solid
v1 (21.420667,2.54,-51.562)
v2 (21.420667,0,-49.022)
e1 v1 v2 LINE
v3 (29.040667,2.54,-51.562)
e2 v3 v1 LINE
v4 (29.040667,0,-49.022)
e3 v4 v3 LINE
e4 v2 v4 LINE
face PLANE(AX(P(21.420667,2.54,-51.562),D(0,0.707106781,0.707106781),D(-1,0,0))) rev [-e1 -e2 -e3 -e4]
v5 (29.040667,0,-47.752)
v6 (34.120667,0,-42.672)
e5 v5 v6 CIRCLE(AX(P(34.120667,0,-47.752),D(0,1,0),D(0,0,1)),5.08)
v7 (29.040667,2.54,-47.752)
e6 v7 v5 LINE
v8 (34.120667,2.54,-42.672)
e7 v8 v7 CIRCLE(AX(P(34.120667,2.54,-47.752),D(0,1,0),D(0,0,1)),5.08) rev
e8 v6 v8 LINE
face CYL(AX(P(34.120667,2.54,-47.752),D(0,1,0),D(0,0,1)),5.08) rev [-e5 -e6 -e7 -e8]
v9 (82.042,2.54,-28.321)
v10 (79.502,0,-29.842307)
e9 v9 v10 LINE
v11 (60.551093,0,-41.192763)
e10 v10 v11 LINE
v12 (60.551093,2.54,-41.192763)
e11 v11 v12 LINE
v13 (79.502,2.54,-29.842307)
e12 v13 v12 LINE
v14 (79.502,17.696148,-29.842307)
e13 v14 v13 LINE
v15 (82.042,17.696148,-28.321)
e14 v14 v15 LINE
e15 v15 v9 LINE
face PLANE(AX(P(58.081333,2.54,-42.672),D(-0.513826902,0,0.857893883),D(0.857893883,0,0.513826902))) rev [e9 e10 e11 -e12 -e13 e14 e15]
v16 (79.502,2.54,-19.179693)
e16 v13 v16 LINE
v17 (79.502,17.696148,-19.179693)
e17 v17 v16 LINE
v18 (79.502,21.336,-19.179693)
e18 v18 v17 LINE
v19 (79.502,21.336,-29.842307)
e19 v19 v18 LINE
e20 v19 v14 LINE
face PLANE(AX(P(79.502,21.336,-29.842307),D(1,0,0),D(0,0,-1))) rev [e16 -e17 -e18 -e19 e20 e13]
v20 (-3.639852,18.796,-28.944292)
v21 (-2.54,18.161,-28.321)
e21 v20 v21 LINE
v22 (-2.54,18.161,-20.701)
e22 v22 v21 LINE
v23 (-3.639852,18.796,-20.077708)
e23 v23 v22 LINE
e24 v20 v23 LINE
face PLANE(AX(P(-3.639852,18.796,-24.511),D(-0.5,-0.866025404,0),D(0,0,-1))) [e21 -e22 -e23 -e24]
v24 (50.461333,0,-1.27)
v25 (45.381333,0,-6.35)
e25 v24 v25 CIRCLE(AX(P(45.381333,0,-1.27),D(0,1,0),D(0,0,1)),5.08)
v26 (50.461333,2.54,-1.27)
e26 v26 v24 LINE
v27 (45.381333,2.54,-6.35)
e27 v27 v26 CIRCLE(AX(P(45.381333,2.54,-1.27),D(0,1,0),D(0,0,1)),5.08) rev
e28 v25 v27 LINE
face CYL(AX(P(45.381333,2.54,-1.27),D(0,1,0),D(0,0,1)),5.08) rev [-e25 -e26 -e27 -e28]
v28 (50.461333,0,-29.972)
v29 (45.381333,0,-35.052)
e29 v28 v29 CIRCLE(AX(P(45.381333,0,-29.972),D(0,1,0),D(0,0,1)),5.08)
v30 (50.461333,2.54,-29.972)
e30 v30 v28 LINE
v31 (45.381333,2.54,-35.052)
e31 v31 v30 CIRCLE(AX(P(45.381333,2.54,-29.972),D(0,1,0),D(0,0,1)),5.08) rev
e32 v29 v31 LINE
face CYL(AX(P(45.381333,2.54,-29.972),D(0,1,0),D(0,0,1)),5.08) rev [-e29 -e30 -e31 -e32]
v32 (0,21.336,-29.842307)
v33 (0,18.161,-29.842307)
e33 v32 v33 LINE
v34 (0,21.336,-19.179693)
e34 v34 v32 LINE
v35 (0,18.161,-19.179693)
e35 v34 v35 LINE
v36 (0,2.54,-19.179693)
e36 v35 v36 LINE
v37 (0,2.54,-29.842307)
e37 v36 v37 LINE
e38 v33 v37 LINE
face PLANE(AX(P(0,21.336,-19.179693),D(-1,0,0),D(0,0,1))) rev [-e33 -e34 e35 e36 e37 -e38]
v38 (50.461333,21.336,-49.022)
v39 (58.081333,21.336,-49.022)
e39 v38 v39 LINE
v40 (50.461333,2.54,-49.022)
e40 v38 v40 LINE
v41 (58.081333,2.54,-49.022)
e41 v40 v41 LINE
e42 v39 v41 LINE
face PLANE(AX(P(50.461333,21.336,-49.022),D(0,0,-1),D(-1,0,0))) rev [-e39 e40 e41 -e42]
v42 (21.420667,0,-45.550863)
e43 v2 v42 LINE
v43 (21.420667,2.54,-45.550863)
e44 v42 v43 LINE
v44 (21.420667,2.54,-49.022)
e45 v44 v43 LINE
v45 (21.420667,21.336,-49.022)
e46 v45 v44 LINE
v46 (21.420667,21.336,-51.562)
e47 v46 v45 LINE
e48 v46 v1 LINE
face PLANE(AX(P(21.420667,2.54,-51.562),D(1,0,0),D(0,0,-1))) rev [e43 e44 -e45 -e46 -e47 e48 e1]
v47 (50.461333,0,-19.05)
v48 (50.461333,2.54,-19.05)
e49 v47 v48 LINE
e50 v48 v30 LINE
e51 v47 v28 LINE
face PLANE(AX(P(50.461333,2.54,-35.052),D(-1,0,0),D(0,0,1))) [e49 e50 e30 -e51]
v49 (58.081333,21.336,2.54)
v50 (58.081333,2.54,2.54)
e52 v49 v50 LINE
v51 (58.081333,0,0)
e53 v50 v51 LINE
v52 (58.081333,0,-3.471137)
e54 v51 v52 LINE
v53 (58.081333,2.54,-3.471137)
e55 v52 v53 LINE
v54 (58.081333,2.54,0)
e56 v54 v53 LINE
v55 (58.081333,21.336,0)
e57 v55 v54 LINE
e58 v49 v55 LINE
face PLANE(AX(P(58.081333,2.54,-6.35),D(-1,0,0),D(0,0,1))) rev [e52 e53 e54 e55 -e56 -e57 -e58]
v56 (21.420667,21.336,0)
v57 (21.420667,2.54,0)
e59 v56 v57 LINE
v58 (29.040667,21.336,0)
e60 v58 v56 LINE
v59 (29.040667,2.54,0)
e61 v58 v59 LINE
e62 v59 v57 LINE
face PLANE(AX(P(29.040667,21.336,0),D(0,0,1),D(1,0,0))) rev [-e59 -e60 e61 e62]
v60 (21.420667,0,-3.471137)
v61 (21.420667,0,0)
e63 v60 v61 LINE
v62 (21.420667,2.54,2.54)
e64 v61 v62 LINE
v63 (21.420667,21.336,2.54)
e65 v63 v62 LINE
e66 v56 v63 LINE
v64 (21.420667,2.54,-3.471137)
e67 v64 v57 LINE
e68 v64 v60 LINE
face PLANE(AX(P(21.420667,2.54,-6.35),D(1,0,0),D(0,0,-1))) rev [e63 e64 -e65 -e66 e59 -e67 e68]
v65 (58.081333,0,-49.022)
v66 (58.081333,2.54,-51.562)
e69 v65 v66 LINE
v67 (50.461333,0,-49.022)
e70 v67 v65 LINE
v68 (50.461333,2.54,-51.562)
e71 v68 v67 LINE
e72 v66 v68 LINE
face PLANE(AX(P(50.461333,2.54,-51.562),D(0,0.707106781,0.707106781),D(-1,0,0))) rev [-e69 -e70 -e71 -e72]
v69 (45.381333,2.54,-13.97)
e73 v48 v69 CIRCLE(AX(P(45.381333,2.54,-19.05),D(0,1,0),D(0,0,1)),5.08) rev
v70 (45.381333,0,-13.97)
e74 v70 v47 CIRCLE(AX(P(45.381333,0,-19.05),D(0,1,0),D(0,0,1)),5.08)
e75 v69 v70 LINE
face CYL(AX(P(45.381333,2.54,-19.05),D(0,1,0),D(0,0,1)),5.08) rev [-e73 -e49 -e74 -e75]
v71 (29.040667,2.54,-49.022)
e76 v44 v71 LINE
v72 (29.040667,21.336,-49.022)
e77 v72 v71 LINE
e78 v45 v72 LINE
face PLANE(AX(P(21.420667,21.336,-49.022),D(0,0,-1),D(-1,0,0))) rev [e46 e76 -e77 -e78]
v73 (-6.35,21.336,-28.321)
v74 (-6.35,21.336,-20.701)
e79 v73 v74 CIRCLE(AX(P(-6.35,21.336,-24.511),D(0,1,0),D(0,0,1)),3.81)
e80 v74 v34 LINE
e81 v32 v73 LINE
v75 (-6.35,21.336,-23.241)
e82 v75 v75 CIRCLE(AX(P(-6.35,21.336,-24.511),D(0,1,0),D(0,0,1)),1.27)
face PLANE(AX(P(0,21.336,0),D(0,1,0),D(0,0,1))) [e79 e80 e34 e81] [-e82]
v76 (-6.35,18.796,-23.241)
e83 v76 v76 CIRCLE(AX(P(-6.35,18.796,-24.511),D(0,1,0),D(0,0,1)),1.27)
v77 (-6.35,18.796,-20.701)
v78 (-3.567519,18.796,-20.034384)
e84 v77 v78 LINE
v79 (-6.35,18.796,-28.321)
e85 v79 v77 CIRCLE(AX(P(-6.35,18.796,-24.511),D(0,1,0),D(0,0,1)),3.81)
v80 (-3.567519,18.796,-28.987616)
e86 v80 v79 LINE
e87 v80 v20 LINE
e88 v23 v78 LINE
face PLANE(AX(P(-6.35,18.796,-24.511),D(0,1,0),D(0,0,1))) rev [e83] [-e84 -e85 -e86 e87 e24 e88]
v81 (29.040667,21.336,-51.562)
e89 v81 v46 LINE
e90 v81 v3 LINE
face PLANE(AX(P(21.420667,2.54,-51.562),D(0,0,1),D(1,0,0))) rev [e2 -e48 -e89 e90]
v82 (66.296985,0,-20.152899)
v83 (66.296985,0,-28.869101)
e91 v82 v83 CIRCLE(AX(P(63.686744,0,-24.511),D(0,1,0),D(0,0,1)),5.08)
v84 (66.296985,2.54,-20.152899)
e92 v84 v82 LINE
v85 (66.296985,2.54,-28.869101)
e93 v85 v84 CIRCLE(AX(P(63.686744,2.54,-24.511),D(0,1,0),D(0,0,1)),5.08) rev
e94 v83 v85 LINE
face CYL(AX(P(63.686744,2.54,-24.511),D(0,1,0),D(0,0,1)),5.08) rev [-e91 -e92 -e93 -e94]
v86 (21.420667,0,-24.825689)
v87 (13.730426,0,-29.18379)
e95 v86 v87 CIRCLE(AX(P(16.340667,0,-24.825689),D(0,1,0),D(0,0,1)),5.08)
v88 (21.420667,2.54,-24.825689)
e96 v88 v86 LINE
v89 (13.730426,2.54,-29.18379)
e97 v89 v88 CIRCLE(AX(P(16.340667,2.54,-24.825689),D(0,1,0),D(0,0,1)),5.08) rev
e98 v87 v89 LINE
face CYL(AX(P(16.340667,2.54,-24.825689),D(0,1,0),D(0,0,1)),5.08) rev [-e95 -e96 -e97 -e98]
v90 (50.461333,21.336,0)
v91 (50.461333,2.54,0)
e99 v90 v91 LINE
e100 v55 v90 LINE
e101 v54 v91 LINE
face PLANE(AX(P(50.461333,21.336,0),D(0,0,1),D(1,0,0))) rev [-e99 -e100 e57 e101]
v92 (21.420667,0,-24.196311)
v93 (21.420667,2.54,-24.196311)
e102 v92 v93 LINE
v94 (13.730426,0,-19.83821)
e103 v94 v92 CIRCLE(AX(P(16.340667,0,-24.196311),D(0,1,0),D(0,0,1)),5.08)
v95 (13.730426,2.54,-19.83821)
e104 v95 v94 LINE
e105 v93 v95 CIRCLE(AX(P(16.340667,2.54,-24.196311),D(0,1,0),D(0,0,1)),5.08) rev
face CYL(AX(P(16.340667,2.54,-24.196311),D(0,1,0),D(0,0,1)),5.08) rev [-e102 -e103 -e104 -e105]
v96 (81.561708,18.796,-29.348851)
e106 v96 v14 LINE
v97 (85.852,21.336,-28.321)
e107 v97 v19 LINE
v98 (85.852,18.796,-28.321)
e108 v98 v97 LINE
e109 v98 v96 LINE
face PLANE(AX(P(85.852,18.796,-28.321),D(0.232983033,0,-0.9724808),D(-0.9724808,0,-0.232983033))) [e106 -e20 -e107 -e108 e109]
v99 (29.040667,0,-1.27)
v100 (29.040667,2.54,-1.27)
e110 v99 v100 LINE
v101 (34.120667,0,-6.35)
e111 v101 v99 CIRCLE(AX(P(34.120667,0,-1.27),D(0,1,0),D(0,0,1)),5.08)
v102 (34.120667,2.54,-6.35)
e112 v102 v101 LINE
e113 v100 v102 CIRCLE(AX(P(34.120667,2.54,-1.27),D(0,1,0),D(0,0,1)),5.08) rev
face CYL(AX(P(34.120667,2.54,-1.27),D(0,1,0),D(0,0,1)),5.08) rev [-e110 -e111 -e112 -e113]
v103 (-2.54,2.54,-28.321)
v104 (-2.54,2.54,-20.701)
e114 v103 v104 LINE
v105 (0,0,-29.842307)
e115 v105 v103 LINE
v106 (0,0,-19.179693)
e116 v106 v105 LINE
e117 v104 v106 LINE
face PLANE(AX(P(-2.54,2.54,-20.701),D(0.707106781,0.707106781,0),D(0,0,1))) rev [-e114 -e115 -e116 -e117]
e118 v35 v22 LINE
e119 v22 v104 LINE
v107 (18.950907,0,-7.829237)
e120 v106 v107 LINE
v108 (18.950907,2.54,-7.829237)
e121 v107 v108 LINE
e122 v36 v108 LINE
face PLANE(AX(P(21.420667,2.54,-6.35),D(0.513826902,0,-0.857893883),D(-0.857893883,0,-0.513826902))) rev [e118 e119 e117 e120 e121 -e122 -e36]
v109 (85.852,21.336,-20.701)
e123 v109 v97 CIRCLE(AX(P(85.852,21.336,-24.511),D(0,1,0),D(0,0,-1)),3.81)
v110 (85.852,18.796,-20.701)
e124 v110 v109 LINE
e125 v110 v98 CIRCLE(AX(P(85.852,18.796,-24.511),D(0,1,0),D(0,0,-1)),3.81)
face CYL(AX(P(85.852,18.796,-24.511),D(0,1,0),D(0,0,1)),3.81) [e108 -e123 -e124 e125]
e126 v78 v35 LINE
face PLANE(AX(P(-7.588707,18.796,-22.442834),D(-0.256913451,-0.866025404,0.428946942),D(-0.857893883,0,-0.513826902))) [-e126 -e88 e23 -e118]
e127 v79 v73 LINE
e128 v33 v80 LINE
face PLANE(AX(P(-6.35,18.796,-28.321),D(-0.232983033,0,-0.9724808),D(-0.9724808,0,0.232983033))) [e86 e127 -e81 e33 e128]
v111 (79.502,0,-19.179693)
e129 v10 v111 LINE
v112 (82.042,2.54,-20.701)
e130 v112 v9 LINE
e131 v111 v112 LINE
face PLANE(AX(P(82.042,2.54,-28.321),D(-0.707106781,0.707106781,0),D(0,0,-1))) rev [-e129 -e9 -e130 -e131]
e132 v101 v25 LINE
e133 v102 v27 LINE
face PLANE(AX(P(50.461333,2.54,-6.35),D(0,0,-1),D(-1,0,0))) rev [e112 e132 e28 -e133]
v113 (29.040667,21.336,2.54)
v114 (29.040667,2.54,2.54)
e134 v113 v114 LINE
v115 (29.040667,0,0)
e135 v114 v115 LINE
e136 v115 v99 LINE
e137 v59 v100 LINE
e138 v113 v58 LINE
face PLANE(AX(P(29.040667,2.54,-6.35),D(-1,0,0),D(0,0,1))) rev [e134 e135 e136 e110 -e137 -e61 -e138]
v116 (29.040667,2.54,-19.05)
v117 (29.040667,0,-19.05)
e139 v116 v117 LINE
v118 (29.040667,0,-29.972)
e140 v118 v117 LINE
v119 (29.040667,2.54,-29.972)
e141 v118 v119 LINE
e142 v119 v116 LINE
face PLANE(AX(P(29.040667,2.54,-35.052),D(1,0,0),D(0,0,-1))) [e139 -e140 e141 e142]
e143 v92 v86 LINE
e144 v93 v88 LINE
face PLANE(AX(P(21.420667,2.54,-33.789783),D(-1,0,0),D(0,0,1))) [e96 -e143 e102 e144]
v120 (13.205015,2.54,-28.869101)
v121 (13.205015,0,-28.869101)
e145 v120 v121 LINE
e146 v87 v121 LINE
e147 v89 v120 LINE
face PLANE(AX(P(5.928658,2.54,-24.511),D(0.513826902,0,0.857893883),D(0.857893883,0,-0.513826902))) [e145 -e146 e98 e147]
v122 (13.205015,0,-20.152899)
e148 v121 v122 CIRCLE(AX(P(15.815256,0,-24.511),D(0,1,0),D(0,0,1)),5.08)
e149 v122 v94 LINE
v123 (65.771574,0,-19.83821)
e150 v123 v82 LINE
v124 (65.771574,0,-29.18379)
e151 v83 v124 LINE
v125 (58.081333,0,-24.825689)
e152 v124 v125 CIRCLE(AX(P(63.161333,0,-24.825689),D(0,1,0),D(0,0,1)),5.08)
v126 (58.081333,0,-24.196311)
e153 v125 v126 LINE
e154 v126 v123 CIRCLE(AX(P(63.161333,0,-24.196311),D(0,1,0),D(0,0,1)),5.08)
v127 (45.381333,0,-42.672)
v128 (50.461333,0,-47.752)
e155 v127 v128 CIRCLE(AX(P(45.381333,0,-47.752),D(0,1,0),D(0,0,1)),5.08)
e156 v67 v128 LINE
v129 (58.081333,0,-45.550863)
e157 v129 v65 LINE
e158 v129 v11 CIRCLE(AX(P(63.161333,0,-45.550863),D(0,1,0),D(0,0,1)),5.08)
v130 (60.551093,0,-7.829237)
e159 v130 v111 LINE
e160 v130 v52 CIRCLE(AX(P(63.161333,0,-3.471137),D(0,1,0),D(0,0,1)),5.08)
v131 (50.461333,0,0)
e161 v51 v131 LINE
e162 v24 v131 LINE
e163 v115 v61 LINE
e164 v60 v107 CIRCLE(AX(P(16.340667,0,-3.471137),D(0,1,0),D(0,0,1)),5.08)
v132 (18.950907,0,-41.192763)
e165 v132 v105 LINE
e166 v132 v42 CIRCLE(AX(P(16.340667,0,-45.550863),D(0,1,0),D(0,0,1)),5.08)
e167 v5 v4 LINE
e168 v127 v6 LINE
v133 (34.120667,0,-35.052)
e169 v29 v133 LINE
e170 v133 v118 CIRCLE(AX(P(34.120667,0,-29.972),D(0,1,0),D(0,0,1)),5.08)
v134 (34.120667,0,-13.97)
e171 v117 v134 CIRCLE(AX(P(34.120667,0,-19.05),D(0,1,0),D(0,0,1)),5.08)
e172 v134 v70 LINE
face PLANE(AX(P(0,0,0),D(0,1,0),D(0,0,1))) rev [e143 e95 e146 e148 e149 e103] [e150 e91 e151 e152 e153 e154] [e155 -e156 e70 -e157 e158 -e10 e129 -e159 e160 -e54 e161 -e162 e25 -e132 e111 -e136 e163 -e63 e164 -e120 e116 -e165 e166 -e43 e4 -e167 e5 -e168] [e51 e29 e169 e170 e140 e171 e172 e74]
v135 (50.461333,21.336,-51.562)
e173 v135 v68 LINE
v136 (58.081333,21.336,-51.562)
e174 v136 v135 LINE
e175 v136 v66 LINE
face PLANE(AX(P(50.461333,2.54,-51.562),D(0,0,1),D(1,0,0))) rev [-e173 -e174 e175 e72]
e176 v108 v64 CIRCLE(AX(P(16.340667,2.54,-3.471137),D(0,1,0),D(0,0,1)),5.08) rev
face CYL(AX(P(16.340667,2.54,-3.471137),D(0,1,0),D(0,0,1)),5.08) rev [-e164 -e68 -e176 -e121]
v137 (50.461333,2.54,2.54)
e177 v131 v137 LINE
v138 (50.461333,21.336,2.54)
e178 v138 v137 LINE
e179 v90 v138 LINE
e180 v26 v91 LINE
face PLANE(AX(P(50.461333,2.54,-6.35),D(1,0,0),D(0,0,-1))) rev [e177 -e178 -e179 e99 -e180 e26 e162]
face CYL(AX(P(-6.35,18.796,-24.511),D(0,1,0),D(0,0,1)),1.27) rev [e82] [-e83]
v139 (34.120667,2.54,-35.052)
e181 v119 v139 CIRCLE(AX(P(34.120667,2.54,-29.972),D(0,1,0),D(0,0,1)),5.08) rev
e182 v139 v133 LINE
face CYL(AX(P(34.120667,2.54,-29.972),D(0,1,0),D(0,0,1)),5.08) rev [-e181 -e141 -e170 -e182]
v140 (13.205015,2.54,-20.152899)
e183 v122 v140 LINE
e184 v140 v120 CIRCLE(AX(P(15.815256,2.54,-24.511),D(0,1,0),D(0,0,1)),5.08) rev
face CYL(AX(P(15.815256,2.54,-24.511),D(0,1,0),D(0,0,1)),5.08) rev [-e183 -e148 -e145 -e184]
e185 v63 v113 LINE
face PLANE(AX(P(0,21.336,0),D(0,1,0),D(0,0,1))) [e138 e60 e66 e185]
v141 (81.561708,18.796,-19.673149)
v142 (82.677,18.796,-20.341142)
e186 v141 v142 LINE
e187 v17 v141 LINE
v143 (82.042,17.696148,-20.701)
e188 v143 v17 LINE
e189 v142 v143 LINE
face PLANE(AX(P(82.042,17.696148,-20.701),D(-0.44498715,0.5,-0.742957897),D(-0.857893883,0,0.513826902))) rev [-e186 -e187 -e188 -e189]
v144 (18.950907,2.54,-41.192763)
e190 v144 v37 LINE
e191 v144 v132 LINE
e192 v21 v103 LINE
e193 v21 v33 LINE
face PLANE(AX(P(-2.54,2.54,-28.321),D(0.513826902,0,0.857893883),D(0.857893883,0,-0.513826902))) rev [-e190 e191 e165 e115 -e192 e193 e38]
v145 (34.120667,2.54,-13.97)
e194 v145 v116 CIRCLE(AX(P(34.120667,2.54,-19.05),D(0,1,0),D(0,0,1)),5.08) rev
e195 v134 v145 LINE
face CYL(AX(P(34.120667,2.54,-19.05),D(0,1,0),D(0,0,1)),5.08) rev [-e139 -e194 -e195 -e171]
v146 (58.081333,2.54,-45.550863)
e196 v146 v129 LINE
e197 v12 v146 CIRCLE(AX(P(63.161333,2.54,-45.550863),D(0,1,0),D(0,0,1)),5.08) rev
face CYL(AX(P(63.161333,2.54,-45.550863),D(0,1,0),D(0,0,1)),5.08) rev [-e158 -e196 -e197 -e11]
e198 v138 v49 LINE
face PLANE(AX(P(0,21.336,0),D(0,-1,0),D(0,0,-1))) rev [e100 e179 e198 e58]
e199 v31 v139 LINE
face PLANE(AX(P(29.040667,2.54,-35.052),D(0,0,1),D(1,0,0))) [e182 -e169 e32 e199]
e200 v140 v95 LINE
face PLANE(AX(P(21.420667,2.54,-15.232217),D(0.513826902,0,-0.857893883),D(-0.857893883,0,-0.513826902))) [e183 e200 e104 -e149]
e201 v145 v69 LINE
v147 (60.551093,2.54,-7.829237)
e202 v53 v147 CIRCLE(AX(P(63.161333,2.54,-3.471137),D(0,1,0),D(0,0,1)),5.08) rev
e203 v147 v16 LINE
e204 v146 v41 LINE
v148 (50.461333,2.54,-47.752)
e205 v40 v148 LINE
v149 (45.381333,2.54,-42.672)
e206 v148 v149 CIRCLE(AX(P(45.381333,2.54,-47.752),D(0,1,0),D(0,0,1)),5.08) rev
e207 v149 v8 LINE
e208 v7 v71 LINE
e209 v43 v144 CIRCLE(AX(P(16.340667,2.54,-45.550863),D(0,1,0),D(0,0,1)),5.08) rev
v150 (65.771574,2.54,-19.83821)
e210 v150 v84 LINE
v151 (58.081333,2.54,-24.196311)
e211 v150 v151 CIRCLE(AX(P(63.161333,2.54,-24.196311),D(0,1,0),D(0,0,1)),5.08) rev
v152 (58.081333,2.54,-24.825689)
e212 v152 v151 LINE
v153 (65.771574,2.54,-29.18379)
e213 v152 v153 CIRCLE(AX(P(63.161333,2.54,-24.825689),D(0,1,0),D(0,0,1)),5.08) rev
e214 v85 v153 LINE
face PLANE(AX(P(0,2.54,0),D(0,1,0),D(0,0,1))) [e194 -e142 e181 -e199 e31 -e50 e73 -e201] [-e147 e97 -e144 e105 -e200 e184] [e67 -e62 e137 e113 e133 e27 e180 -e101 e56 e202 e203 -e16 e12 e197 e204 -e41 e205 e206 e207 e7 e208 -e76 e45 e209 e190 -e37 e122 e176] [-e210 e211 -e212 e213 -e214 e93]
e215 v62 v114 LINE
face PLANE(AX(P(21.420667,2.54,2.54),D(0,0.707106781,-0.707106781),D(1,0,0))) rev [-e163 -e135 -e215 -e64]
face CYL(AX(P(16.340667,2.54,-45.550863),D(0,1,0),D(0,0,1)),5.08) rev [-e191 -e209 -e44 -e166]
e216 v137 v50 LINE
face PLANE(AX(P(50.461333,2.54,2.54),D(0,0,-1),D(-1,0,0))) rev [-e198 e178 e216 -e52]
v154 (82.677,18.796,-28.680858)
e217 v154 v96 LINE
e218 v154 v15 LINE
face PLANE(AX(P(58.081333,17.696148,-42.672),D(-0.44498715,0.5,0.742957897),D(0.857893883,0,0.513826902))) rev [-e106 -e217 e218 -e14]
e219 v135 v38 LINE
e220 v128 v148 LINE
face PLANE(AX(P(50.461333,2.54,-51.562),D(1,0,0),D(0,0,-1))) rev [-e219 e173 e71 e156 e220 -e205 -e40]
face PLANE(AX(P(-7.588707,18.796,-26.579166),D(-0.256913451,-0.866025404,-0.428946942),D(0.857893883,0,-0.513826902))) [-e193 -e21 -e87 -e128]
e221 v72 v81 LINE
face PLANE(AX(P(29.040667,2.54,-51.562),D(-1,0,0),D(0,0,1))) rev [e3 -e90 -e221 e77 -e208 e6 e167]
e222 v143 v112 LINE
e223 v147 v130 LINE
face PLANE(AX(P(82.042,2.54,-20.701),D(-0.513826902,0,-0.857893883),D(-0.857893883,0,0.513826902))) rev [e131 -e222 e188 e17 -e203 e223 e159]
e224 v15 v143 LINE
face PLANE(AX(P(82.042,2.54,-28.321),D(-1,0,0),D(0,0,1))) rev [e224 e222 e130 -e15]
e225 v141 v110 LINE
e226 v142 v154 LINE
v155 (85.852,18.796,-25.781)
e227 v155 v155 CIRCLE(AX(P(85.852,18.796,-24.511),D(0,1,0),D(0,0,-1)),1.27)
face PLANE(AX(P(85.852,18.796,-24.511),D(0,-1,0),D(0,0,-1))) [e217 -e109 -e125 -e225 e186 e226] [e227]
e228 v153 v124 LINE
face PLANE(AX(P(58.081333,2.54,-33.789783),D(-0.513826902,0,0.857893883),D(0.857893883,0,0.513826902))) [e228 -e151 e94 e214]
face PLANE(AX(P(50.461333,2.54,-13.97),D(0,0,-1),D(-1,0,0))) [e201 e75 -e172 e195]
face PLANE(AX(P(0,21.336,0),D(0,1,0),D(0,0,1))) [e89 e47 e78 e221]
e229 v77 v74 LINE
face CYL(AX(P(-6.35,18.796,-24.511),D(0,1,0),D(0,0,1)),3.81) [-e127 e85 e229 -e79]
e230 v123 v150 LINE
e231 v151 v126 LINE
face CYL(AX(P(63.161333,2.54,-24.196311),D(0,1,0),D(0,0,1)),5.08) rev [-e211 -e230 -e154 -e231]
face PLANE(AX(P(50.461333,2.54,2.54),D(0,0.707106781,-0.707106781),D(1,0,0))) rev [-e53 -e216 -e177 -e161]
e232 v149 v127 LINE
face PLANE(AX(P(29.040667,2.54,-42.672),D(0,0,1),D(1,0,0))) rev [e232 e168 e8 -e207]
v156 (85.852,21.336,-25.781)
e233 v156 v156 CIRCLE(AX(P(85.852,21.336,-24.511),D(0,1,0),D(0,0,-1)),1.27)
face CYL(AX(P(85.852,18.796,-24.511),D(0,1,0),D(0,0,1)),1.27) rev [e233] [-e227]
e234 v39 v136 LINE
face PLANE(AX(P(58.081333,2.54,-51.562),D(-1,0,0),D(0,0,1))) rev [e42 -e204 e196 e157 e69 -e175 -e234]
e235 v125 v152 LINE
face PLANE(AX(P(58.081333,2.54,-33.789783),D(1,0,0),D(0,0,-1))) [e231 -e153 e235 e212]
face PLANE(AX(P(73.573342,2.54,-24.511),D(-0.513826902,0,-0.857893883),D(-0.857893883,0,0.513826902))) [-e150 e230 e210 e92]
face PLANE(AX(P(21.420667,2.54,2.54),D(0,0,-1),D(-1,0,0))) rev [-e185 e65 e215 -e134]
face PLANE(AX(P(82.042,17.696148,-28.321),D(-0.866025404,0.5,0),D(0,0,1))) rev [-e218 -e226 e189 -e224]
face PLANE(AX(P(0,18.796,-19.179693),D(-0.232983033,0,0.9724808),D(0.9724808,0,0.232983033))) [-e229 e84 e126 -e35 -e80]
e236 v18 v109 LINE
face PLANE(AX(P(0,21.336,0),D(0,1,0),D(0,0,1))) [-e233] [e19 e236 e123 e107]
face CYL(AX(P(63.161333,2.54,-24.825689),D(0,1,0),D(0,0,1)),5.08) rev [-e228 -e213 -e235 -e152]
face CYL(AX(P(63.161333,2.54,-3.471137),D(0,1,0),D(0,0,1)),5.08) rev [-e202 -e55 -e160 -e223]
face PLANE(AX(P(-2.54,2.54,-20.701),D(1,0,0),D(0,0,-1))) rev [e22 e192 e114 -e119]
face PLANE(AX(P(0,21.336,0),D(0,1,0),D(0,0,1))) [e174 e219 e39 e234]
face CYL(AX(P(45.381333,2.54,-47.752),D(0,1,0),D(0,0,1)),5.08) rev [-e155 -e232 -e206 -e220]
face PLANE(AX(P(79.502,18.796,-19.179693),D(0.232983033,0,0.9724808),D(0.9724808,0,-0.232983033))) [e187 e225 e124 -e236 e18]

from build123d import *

# Parameters (mm, degrees)
SKETCH1_W           = 21.420666666
SKETCH1_H           = 21.082
BOSS_EXTRUDE1_DEPTH = 2.54
SKETCH2_W           = 7.62
SKETCH2_H           = 2.54
BOSS_EXTRUDE2_DEPTH = 18.796
FILLET1_R           = 5.08
CHAMFER1_SIZE       = 2.54
SKETCH3_R           = 1.27
BOSS_EXTRUDE3_DEPTH = 2.54
CHAMFER2_SIZE       = 0.635
CHAMFER2_SIZE_2     = 1.099852263


with BuildPart() as part:
    # Sketch1 → Boss-Extrude1 (new body)
    with BuildSketch(Plane(origin=(0, 0, 0), x_dir=(1, 0, 0), z_dir=(0, 1, 0))):
        Polygon((-2.54, 28.321), (21.420666667, 42.672), (21.420666667, 51.562), (29.040666667, 51.562), (29.040666667, 42.672), (50.461333333, 42.672), (50.461333333, 51.562), (58.081333333, 51.562), (58.081333333, 42.672), (82.042, 28.321), (82.042, 20.701), (58.081333333, 6.35), (58.081333333, -2.54), (50.461333333, -2.54), (50.461333333, 6.35), (29.040666667, 6.35), (29.040666667, -2.54), (21.420666667, -2.54), (21.420666667, 6.35), (-2.54, 20.701), align=None)
        Polygon((5.928658004, 24.511), (21.420666667, 33.789782574), (21.420666667, 15.232217426), align=None, mode=Mode.SUBTRACT)
        with Locations((39.751, 24.511)):
            Rectangle(SKETCH1_W, SKETCH1_H, mode=Mode.SUBTRACT)
        Polygon((58.081333333, 33.789782574), (73.573341996, 24.511), (58.081333333, 15.232217426), align=None, mode=Mode.SUBTRACT)
    extrude(amount=BOSS_EXTRUDE1_DEPTH)

    # Sketch2 → Boss-Extrude2 (add)
    with BuildSketch(Plane(origin=(0, 2.54, 0), x_dir=(1, 0, 0), z_dir=(0, 1, 0))):
        with Locations((25.230666667, 50.292)):
            Rectangle(SKETCH2_W, SKETCH2_H)
        with Locations((54.271333333, 50.292)):
            Rectangle(SKETCH2_W, SKETCH2_H)
        with Locations((25.230666667, -1.27)):
            Rectangle(SKETCH2_W, SKETCH2_H)
        with Locations((54.271333333, -1.27)):
            Rectangle(SKETCH2_W, SKETCH2_H)
        Polygon((-2.54, 20.701), (0, 19.17969258), (0, 29.84230742), (-2.54, 28.321), align=None)
        Polygon((82.042, 28.321), (79.502, 29.84230742), (79.502, 19.17969258), (82.042, 20.701), align=None)
    extrude(amount=BOSS_EXTRUDE2_DEPTH)

    # Fillet1
    fillet1_edges = [part.edges().sort_by_distance(p)[0] for p in [
        (29.040666667, 1.27, -42.672),
        (50.461333333, 1.27, -42.672),
        (58.081333333, 1.27, -42.672),
        (58.081333333, 1.27, -6.35),
        (50.461333333, 1.27, -6.35),
        (29.040666667, 1.27, -6.35),
        (21.420666667, 1.27, -6.35),
        (21.420666667, 1.27, -42.672),
        (5.928658004, 1.27, -24.511),
        (21.420666667, 1.27, -15.232217426),
        (21.420666667, 1.27, -33.789782574),
        (58.081333333, 1.27, -15.232217426),
        (73.573341996, 1.27, -24.511),
        (58.081333333, 1.27, -33.789782574),
        (29.040666667, 1.27, -35.052),
        (29.040666667, 1.27, -13.97),
        (50.461333333, 1.27, -13.97),
        (50.461333333, 1.27, -35.052),
    ]]
    fillet(fillet1_edges, radius=FILLET1_R)

    # Chamfer1
    chamfer1_edges = [part.edges().sort_by_distance(p)[0] for p in [
        (25.230666667, 0, -51.562),
        (54.271333333, 0, -51.562),
        (82.042, 0, -24.511),
        (54.271333333, 0, 2.54),
        (25.230666667, 0, 2.54),
        (-2.54, 0, -24.511),
    ]]
    chamfer(chamfer1_edges, length=CHAMFER1_SIZE)

    # Sketch3 → Boss-Extrude3 (add)
    # profile 1 of 2: a face of its own
    with BuildSketch(Plane(origin=(0, 21.336, 0), x_dir=(1, 0, 0), z_dir=(0, 1, 0))):
        with BuildLine():
            Line((-6.35, 28.321), (0, 29.84230742))
            Line((0, 29.84230742), (0, 19.17969258))
            Line((0, 19.17969258), (-6.35, 20.701))
            ThreePointArc((-6.35, 20.701), (-10.16, 24.511), (-6.35, 28.321))
        make_face()
        with Locations(Location((-6.35, 24.511, 0), (0, 0, 270))):
            Circle(SKETCH3_R, mode=Mode.SUBTRACT)
    # profile 2 of 2: a face of its own
    with BuildSketch(Plane(origin=(0, 21.336, 0), x_dir=(1, 0, 0), z_dir=(0, 1, 0))):
        with BuildLine():
            Line((79.502, 19.17969258), (85.852, 20.701))
            ThreePointArc((85.852, 20.701), (89.662, 24.511), (85.852, 28.321))
            Line((85.852, 28.321), (79.502, 29.84230742))
            Line((79.502, 29.84230742), (79.502, 19.17969258))
        make_face()
        with Locations(Location((85.852, 24.511, 0), (0, 0, 90))):
            Circle(SKETCH3_R, mode=Mode.SUBTRACT)
    extrude(amount=-BOSS_EXTRUDE3_DEPTH)

    # Chamfer2
    # the kernel refuses this chamfer: 1.099852263, 0.635 mm, written as the material it adds along each edge
    with BuildSketch(Plane(origin=(2.441061654, 18.796, -31.304356715), x_dir=(0, -1, 0), z_dir=(-0.8578938832772348, 0, 0.5138269018215241))) as chamfer2_piece_1_section:
        Polygon((CHAMFER2_SIZE, 0), (0, -CHAMFER2_SIZE_2), (0, 0), align=None)
    chamfer2_piece_1 = extrude(amount=8.651563385, mode=Mode.PRIVATE)
    chamfer2_piece_1 = split(chamfer2_piece_1, bisect_by=Plane(origin=(-2.54, 18.796, -31.304356715), z_dir=(1, 0, 0)), keep=Keep.TOP, mode=Mode.PRIVATE)
    chamfer2_piece_1 = split(chamfer2_piece_1, bisect_by=Plane(origin=(2.639816898, 18.796, -30.474744119), z_dir=(0.2329830326651444, 0, 0.9724808000624754)), keep=Keep.TOP, mode=Mode.PRIVATE)
    add(chamfer2_piece_1)
    with BuildSketch(Plane(origin=(-2.54, 18.796, -31.166412121), x_dir=(-1, 0, 0), z_dir=(0, 0, 1))) as chamfer2_piece_2_section:
        Polygon((CHAMFER2_SIZE_2, 0), (0, CHAMFER2_SIZE), (0, 0), align=None)
    chamfer2_piece_2 = extrude(amount=13.310824243, mode=Mode.PRIVATE)
    chamfer2_piece_2 = split(chamfer2_piece_2, bisect_by=Plane(origin=(-1.285716853, 18.796, -29.072240259), z_dir=(0.5138269018215241, 0, 0.8578938832772348)), keep=Keep.TOP, mode=Mode.PRIVATE)
    chamfer2_piece_2 = split(chamfer2_piece_2, bisect_by=Plane(origin=(-7.153247393, 18.796, -23.464058067), z_dir=(0.5138269018215242, 0, -0.8578938832772348)), keep=Keep.TOP, mode=Mode.PRIVATE)
    add(chamfer2_piece_2)
    with BuildSketch(Plane(origin=(-4.981061654, 18.796, -22.163049295), x_dir=(-0.5138269018215241, -3.2301735414316882e-15, 0.8578938832772347), z_dir=(0.8578938832772348, 0, 0.5138269018215242))) as chamfer2_piece_3_section:
        Polygon((CHAMFER2_SIZE_2, 0), (0, CHAMFER2_SIZE), (0, 0), align=None)
    chamfer2_piece_3 = extrude(amount=8.651563385, mode=Mode.PRIVATE)
    chamfer2_piece_3 = split(chamfer2_piece_3, bisect_by=Plane(origin=(-2.54, 18.796, -22.163049295), z_dir=(1, 0, 0)), keep=Keep.TOP, mode=Mode.PRIVATE)
    chamfer2_piece_3 = split(chamfer2_piece_3, bisect_by=Plane(origin=(-5.386627864, 18.796, -20.470199184), z_dir=(0.2329830326651444, 0, -0.9724808000624754)), keep=Keep.TOP, mode=Mode.PRIVATE)
    add(chamfer2_piece_3)
    with BuildSketch(Plane(origin=(82.042, 18.796, -31.166412121), x_dir=(0, -1, 0), z_dir=(0, 0, 1))) as chamfer2_piece_4_section:
        Polygon((CHAMFER2_SIZE_2, 0), (0, CHAMFER2_SIZE), (0, 0), align=None)
    chamfer2_piece_4 = extrude(amount=13.310824243, mode=Mode.PRIVATE)
    chamfer2_piece_4 = split(chamfer2_piece_4, bisect_by=Plane(origin=(80.787716853, 18.796, -29.072240259), z_dir=(-0.5138269018215241, 0, 0.8578938832772348)), keep=Keep.TOP, mode=Mode.PRIVATE)
    chamfer2_piece_4 = split(chamfer2_piece_4, bisect_by=Plane(origin=(86.655247393, 18.796, -23.464058067), z_dir=(-0.5138269018215241, 0, -0.8578938832772349)), keep=Keep.TOP, mode=Mode.PRIVATE)
    add(chamfer2_piece_4)
    with BuildSketch(Plane(origin=(84.483061654, 18.796, -22.163049295), x_dir=(0, -1, 0), z_dir=(-0.8578938832772349, 0, 0.5138269018215241))) as chamfer2_piece_5_section:
        Polygon((CHAMFER2_SIZE_2, 0), (0, CHAMFER2_SIZE), (0, 0), align=None)
    chamfer2_piece_5 = extrude(amount=8.651563385, mode=Mode.PRIVATE)
    chamfer2_piece_5 = split(chamfer2_piece_5, bisect_by=Plane(origin=(82.042, 18.796, -22.163049295), z_dir=(-1, 0, 0)), keep=Keep.TOP, mode=Mode.PRIVATE)
    chamfer2_piece_5 = split(chamfer2_piece_5, bisect_by=Plane(origin=(84.888627864, 18.796, -20.470199184), z_dir=(-0.23298303266514464, 0, -0.9724808000624754)), keep=Keep.TOP, mode=Mode.PRIVATE)
    add(chamfer2_piece_5)
    with BuildSketch(Plane(origin=(77.060938346, 18.796, -31.304356715), x_dir=(0, -1, 0), z_dir=(0.8578938832772348, 0, 0.5138269018215241))) as chamfer2_piece_6_section:
        Polygon((CHAMFER2_SIZE_2, 0), (0, CHAMFER2_SIZE), (0, 0), align=None)
    chamfer2_piece_6 = extrude(amount=8.651563385, mode=Mode.PRIVATE)
    chamfer2_piece_6 = split(chamfer2_piece_6, bisect_by=Plane(origin=(82.042, 18.796, -31.304356715), z_dir=(-1, 0, 0)), keep=Keep.TOP, mode=Mode.PRIVATE)
    chamfer2_piece_6 = split(chamfer2_piece_6, bisect_by=Plane(origin=(76.862183102, 18.796, -30.474744119), z_dir=(-0.23298303266514414, 0, 0.9724808000624755)), keep=Keep.TOP, mode=Mode.PRIVATE)
    add(chamfer2_piece_6)
    with BuildSketch(Plane(origin=(2.441061654, 18.796, -31.304356715), x_dir=(0, -1, 0), z_dir=(-0.8578938832772348, 0, 0.5138269018215241))) as chamfer2_piece_7a_section:
        Polygon((CHAMFER2_SIZE, 0), (0, -CHAMFER2_SIZE_2), (0, 0), align=None)
    chamfer2_piece_7a = extrude(amount=8.651563385, mode=Mode.PRIVATE)
    chamfer2_piece_7a = split(chamfer2_piece_7a, bisect_by=Plane(origin=(-2.54, 18.796, -31.304356715), z_dir=(-1, 0, 0)), keep=Keep.TOP, mode=Mode.PRIVATE)
    chamfer2_piece_7a = split(chamfer2_piece_7a, bisect_by=Plane(origin=(2.639816898, 18.796, -30.474744119), z_dir=(0.2329830326651444, 0, 0.9724808000624754)), keep=Keep.TOP, mode=Mode.PRIVATE)
    with BuildSketch(Plane(origin=(-2.54, 18.796, -31.166412121), x_dir=(-1, 0, 0), z_dir=(0, 0, 1))) as chamfer2_piece_7b_section:
        Polygon((CHAMFER2_SIZE_2, 0), (0, CHAMFER2_SIZE), (0, 0), align=None)
    chamfer2_piece_7b = extrude(amount=13.310824243, mode=Mode.PRIVATE)
    chamfer2_piece_7b = split(chamfer2_piece_7b, bisect_by=Plane(origin=(-1.285716853, 18.796, -29.072240259), z_dir=(-0.5138269018215241, 0, -0.8578938832772348)), keep=Keep.TOP, mode=Mode.PRIVATE)
    chamfer2_piece_7b = split(chamfer2_piece_7b, bisect_by=Plane(origin=(-2.1021216, 18.796, -29.338689596), z_dir=(0.2329830326651444, 0, 0.9724808000624754)), keep=Keep.TOP, mode=Mode.PRIVATE)
    chamfer2_piece_7 = chamfer2_piece_7a & chamfer2_piece_7b
    add(chamfer2_piece_7)
    with BuildSketch(Plane(origin=(-4.981061654, 18.796, -22.163049295), x_dir=(-0.5138269018215241, -3.2301735414316882e-15, 0.8578938832772347), z_dir=(0.8578938832772348, 0, 0.5138269018215242))) as chamfer2_piece_8a_section:
        Polygon((CHAMFER2_SIZE_2, 0), (0, CHAMFER2_SIZE), (0, 0), align=None)
    chamfer2_piece_8a = extrude(amount=8.651563385, mode=Mode.PRIVATE)
    chamfer2_piece_8a = split(chamfer2_piece_8a, bisect_by=Plane(origin=(-2.54, 18.796, -22.163049295), z_dir=(-1, 0, 0)), keep=Keep.TOP, mode=Mode.PRIVATE)
    chamfer2_piece_8a = split(chamfer2_piece_8a, bisect_by=Plane(origin=(-5.386627864, 18.796, -20.470199184), z_dir=(0.2329830326651444, 0, -0.9724808000624754)), keep=Keep.TOP, mode=Mode.PRIVATE)
    with BuildSketch(Plane(origin=(-2.54, 18.796, -31.166412121), x_dir=(-1, 0, 0), z_dir=(0, 0, 1))) as chamfer2_piece_8b_section:
        Polygon((CHAMFER2_SIZE_2, 0), (0, CHAMFER2_SIZE), (0, 0), align=None)
    chamfer2_piece_8b = extrude(amount=13.310824243, mode=Mode.PRIVATE)
    chamfer2_piece_8b = split(chamfer2_piece_8b, bisect_by=Plane(origin=(-7.153247393, 18.796, -23.464058067), z_dir=(-0.5138269018215242, 0, 0.8578938832772348)), keep=Keep.TOP, mode=Mode.PRIVATE)
    chamfer2_piece_8b = split(chamfer2_piece_8b, bisect_by=Plane(origin=(-5.117975361, 18.796, -20.4058365), z_dir=(0.2329830326651444, 0, -0.9724808000624754)), keep=Keep.TOP, mode=Mode.PRIVATE)
    chamfer2_piece_8 = chamfer2_piece_8a & chamfer2_piece_8b
    add(chamfer2_piece_8)
    with BuildSketch(Plane(origin=(77.060938346, 18.796, -31.304356715), x_dir=(0, -1, 0), z_dir=(0.8578938832772348, 0, 0.5138269018215241))) as chamfer2_piece_9a_section:
        Polygon((CHAMFER2_SIZE_2, 0), (0, CHAMFER2_SIZE), (0, 0), align=None)
    chamfer2_piece_9a = extrude(amount=8.651563385, mode=Mode.PRIVATE)
    chamfer2_piece_9a = split(chamfer2_piece_9a, bisect_by=Plane(origin=(82.042, 18.796, -31.304356715), z_dir=(1, 0, 0)), keep=Keep.TOP, mode=Mode.PRIVATE)
    with BuildSketch(Plane(origin=(82.042, 18.796, -31.166412121), x_dir=(0, -1, 0), z_dir=(0, 0, 1))) as chamfer2_piece_9b_section:
        Polygon((CHAMFER2_SIZE_2, 0), (0, CHAMFER2_SIZE), (0, 0), align=None)
    chamfer2_piece_9b = extrude(amount=13.310824243, mode=Mode.PRIVATE)
    chamfer2_piece_9b = split(chamfer2_piece_9b, bisect_by=Plane(origin=(80.787716853, 18.796, -29.072240259), z_dir=(0.5138269018215241, 0, -0.8578938832772348)), keep=Keep.TOP, mode=Mode.PRIVATE)
    chamfer2_piece_9b = split(chamfer2_piece_9b, bisect_by=Plane(origin=(81.6041216, 18.796, -29.338689596), z_dir=(-0.23298303266514414, 0, 0.9724808000624755)), keep=Keep.TOP, mode=Mode.PRIVATE)
    chamfer2_piece_9 = chamfer2_piece_9a & chamfer2_piece_9b
    add(chamfer2_piece_9)
    with BuildSketch(Plane(origin=(84.483061654, 18.796, -22.163049295), x_dir=(0, -1, 0), z_dir=(-0.8578938832772349, 0, 0.5138269018215241))) as chamfer2_piece_10a_section:
        Polygon((CHAMFER2_SIZE_2, 0), (0, CHAMFER2_SIZE), (0, 0), align=None)
    chamfer2_piece_10a = extrude(amount=8.651563385, mode=Mode.PRIVATE)
    chamfer2_piece_10a = split(chamfer2_piece_10a, bisect_by=Plane(origin=(82.042, 18.796, -22.163049295), z_dir=(1, 0, 0)), keep=Keep.TOP, mode=Mode.PRIVATE)
    with BuildSketch(Plane(origin=(82.042, 18.796, -31.166412121), x_dir=(0, -1, 0), z_dir=(0, 0, 1))) as chamfer2_piece_10b_section:
        Polygon((CHAMFER2_SIZE_2, 0), (0, CHAMFER2_SIZE), (0, 0), align=None)
    chamfer2_piece_10b = extrude(amount=13.310824243, mode=Mode.PRIVATE)
    chamfer2_piece_10b = split(chamfer2_piece_10b, bisect_by=Plane(origin=(86.655247393, 18.796, -23.464058067), z_dir=(0.5138269018215241, 0, 0.8578938832772349)), keep=Keep.TOP, mode=Mode.PRIVATE)
    chamfer2_piece_10b = split(chamfer2_piece_10b, bisect_by=Plane(origin=(84.619975361, 18.796, -20.4058365), z_dir=(-0.23298303266514464, 0, -0.9724808000624754)), keep=Keep.TOP, mode=Mode.PRIVATE)
    chamfer2_piece_10 = chamfer2_piece_10a & chamfer2_piece_10b
    add(chamfer2_piece_10)


solid = part.part
